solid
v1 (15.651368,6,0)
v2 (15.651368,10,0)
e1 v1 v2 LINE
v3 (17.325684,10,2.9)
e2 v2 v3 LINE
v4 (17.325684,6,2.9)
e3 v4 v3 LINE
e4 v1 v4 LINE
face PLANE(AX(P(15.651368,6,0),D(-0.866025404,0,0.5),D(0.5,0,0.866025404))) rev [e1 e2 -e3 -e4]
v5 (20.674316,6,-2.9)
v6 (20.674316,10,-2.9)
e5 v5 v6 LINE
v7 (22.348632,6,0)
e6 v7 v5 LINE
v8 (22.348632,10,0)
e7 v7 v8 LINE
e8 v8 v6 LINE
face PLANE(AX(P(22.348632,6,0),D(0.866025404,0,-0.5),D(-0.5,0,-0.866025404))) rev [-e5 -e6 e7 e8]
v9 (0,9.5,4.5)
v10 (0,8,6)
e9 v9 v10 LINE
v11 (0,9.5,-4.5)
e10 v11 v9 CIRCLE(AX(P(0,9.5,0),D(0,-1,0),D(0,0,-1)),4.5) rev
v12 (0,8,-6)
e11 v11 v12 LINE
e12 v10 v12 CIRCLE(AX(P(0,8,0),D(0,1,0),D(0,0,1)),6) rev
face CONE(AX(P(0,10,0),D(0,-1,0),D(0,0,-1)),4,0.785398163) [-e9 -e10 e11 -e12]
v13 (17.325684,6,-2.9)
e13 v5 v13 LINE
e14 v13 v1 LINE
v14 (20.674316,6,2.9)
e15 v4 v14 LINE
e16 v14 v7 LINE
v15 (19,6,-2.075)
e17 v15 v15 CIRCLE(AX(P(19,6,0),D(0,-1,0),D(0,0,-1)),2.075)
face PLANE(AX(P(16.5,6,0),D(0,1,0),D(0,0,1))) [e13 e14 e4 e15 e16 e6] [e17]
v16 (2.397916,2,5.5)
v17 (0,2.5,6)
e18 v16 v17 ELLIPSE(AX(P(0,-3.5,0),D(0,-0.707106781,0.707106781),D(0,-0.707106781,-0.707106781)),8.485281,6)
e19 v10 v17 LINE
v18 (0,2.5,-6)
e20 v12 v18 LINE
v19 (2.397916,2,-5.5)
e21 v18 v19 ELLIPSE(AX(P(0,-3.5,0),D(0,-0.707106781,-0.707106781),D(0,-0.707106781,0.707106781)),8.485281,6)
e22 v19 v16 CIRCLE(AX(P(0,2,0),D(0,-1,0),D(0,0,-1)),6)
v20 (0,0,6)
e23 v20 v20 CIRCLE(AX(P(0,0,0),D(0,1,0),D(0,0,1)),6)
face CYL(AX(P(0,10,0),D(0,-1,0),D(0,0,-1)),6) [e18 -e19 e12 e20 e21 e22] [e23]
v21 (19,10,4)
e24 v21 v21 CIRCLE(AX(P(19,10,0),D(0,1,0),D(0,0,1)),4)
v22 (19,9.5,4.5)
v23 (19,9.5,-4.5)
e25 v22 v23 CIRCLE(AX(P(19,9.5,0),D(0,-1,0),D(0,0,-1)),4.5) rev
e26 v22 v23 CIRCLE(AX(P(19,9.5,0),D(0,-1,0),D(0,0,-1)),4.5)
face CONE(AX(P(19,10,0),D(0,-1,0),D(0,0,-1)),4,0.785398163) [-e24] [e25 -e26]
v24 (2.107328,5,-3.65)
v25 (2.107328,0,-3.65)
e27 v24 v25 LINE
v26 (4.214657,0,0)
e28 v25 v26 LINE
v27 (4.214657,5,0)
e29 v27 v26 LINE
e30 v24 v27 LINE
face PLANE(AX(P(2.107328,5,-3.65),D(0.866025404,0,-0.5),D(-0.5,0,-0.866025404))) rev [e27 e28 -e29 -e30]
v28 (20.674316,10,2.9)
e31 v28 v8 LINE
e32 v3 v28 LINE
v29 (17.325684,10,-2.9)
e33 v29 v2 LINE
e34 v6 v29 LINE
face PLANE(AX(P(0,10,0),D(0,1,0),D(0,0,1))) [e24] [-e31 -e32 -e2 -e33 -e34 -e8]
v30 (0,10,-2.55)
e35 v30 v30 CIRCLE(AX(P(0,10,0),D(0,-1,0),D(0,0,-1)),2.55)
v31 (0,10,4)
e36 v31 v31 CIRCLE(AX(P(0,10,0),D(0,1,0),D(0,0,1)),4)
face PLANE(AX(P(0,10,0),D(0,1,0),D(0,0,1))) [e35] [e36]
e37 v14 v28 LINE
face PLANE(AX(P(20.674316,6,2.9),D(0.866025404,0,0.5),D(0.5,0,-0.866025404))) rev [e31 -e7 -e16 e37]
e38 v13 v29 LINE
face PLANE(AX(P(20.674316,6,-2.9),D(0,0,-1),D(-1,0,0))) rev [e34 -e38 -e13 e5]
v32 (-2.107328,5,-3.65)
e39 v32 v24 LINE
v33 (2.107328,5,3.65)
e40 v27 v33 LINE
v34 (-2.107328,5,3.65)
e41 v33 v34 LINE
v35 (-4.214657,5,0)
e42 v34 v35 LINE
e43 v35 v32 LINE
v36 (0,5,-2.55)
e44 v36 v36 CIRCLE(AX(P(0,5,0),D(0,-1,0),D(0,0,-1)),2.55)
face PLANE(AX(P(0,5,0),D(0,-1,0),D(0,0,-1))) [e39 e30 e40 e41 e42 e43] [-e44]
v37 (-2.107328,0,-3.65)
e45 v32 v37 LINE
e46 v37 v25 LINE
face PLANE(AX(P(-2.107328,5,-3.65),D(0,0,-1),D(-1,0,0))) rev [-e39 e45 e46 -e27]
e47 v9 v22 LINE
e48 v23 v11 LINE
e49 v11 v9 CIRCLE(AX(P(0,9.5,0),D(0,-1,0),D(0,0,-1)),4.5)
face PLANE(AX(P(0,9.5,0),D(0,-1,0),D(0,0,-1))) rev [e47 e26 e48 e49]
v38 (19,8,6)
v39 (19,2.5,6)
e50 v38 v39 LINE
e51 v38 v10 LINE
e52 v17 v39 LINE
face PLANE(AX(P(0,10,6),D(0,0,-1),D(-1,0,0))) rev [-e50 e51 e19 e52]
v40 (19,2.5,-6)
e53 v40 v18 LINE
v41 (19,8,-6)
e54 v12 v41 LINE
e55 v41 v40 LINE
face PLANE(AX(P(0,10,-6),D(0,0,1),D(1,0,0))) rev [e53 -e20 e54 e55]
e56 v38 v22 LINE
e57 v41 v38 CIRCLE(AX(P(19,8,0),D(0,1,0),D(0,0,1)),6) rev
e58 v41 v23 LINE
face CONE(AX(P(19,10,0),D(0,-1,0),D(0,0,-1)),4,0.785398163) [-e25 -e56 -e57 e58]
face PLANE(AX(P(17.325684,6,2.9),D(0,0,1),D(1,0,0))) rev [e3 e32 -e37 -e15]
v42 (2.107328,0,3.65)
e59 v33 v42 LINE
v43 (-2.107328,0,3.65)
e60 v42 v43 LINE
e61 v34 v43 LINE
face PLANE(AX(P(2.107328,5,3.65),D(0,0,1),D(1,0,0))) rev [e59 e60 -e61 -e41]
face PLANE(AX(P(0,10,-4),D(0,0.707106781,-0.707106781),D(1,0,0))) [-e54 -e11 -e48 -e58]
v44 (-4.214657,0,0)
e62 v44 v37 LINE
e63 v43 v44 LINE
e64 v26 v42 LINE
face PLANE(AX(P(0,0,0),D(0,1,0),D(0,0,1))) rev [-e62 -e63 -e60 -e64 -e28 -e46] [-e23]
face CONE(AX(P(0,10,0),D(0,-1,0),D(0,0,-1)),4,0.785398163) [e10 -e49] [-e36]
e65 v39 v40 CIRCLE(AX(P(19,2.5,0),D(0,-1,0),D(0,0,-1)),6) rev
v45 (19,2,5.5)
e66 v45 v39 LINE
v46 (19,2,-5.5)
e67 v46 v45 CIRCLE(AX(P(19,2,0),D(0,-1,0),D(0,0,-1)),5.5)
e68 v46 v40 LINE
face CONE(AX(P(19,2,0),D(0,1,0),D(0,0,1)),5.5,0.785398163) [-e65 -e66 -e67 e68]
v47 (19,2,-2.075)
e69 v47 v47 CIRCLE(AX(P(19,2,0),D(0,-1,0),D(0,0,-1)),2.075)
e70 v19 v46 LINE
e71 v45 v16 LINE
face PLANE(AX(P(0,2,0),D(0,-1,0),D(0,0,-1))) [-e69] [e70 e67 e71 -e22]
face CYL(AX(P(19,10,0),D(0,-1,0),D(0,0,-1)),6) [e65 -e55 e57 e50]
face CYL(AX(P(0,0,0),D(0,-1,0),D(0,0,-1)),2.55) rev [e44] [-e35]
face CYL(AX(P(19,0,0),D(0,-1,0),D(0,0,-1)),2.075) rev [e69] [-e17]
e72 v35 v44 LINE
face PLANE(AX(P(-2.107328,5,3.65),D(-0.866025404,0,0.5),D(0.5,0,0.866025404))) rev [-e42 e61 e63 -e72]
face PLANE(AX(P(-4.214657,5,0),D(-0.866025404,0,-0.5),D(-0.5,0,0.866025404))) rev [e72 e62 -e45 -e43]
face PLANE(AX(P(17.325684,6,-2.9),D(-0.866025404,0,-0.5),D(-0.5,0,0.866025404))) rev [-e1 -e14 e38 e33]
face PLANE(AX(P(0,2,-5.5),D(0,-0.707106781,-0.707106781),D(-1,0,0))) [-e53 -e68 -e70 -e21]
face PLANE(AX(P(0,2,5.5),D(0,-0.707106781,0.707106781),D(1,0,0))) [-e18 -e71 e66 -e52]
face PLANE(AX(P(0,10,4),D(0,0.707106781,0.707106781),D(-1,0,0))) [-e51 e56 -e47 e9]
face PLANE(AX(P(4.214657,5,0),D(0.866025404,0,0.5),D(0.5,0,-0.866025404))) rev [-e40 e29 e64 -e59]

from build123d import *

# Parameters (mm, degrees)
BOSS_EXTRUDE1_DEPTH = 10
CHAMFER1_SIZE       = 2
CUT_EXTRUDE1_DEPTH  = 5
SKETCH5_R           = 34.202431596
SKETCH5_R_2         = 6
CUT_EXTRUDE2_DEPTH  = 2
CUT_EXTRUDE3_DEPTH  = 4
CHAMFER2_SIZE       = 0.5
SKETCH7_W           = 40.92273168
SKETCH7_H           = 22.154300558
SKETCH7_R           = 4
CUT_EXTRUDE4_DEPTH  = 0.5
CHAMFER3_SIZE       = 0.5


# Some blends are built 0.0001 mm under size
with BuildPart() as part:
    # Sketch1 → Boss-Extrude1 (new body)
    with BuildSketch(Plane(origin=(0, 0, 0), x_dir=(1, 0, 0), z_dir=(0, 1, 0))):
        with BuildLine():
            Line((0, 6), (19, 6))
            ThreePointArc((19, 6), (25, 0), (19, -6))
            Line((19, -6), (0, -6))
            ThreePointArc((0, -6), (-6, 0), (0, 6))
        make_face()
    extrude(amount=BOSS_EXTRUDE1_DEPTH)

    # Sketch2 → Cut-Revolve1 (revolve, cut)
    with BuildSketch(Plane.XY, mode=Mode.PRIVATE) as cut_revolve1_sk:
        Polygon((0, 10), (-2.55, 10), (-2.55, 5), (-2.1, 5), (-2.1, 2), (-2.55, 2), (-2.55, 0), (0, 0), align=None)
    revolve(cut_revolve1_sk.sketch.rotate(Axis((0, 0, 0), (0, 1, 0)), 270), axis=Axis((0, 0, 0), (0, 1, 0)), mode=Mode.SUBTRACT)

    # Sketch3 → Cut-Revolve2 (revolve, cut)
    with BuildSketch(Plane.XY, mode=Mode.PRIVATE) as cut_revolve2_sk:
        Polygon((19, 10), (16.5, 10), (16.5, 6), (16.925, 6), (16.925, 0), (19, 0), align=None)
    revolve(cut_revolve2_sk.sketch.rotate(Axis((19, 0, 0), (0, 1, 0)), 270), axis=Axis((19, 0, 0), (0, 1, 0)), mode=Mode.SUBTRACT)

    # Chamfer1
    chamfer1_edges = [part.edges().sort_by_distance(p)[0] for p in [
        (25, 10, 0),
        (9.5, 10, -6),
        (-6, 10, 0),
        (9.5, 10, 6),
    ]]
    chamfer(chamfer1_edges, length=CHAMFER1_SIZE)

    # Sketch4 → Cut-Extrude1 (cut)
    with BuildSketch(Plane.XZ):
        Polygon((2.107328483, 3.65), (-2.107328483, 3.65), (-4.214656965, 0), (-2.107328483, -3.65), (2.107328483, -3.65), (4.214656965, 0), align=None)
    extrude(amount=-CUT_EXTRUDE1_DEPTH, mode=Mode.SUBTRACT)

    # Sketch5 → Cut-Extrude2 (cut)
    with BuildSketch(Plane.XZ):
        Circle(SKETCH5_R)
        with Locations(Location((0, 0, 0), (0, 0, 90))):
            Circle(SKETCH5_R_2, mode=Mode.SUBTRACT)
    extrude(amount=-CUT_EXTRUDE2_DEPTH, mode=Mode.SUBTRACT)

    # Sketch6 → Cut-Extrude3 (cut)
    with BuildSketch(Plane(origin=(0, 10, 0), x_dir=(1, 0, 0), z_dir=(0, 1, 0))):
        Polygon((20.674315781, -2.9), (22.348631561, 0), (20.674315781, 2.9), (17.325684219, 2.9), (15.651368439, 0), (17.325684219, -2.9), align=None)
    extrude(amount=-CUT_EXTRUDE3_DEPTH, mode=Mode.SUBTRACT)

    # Chamfer2
    # the kernel refuses this chamfer: 0.5 mm, written as the material it takes off along each edge
    with BuildSketch(Plane(origin=(19, 2, 0), x_dir=(0, 0, -1), z_dir=(-1, 0, 0))) as chamfer2_piece_1:
        Polygon((6 - CHAMFER2_SIZE, 0), (6, -CHAMFER2_SIZE), (6, 0), align=None)
    revolve(axis=Axis((19, 2, 0), (0, -1, 0)), revolution_arc=180, mode=Mode.SUBTRACT)
    with BuildSketch(Plane(origin=(-1.285841494, 2, 6), x_dir=(0, -0.02749587661058651, -0.9996219169112968), z_dir=(1, 0, 0))) as chamfer2_piece_2_section:
        Polygon((CHAMFER2_SIZE * 0.999621916911, CHAMFER2_SIZE * 0.0274958766106), (-CHAMFER2_SIZE * 0.0274958766106, CHAMFER2_SIZE * 0.999621916911), (0, 0), align=None)
    chamfer2_piece_2 = extrude(amount=20.285841494, mode=Mode.PRIVATE)
    chamfer2_piece_2 = chamfer2_piece_2 - Plane(origin=(0, 2.170377839, 0), x_dir=(0, 0, 1), z_dir=(0, -1, 0)) * Cylinder(6, 43, mode=Mode.PRIVATE)
    add(chamfer2_piece_2, mode=Mode.SUBTRACT)
    with BuildSketch(Plane(origin=(19, 2, -6), x_dir=(0, 0.9996219169112968, -0.027495876610585623), z_dir=(-1, 0, 0))) as chamfer2_piece_3_section:
        Polygon((CHAMFER2_SIZE * 0.999621916911, -CHAMFER2_SIZE * 0.0274958766106), (-CHAMFER2_SIZE * 0.0274958766106, -CHAMFER2_SIZE * 0.999621916911), (0, 0), align=None)
    chamfer2_piece_3 = extrude(amount=20.285841494, mode=Mode.PRIVATE)
    chamfer2_piece_3 = chamfer2_piece_3 - Plane(origin=(0, 2.17037784, 0), x_dir=(0, 0, 1), z_dir=(0, -1, 0)) * Cylinder(6, 43, mode=Mode.PRIVATE)
    add(chamfer2_piece_3, mode=Mode.SUBTRACT)

    # Sketch7 → Cut-Extrude4 (cut)
    with BuildSketch(Plane(origin=(0, 10, 0), x_dir=(1, 0, 0), z_dir=(0, 1, 0))):
        with Locations((9.45107525, -1.501135351)):
            Rectangle(SKETCH7_W, SKETCH7_H)
        with Locations(Location((19, 0, 0), (0, 0, 270))):
            Circle(SKETCH7_R, mode=Mode.SUBTRACT)
        with Locations(Location((0, 0, 0), (0, 0, 270))):
            Circle(SKETCH7_R, mode=Mode.SUBTRACT)
    extrude(amount=-CUT_EXTRUDE4_DEPTH, mode=Mode.SUBTRACT)

    # Chamfer3
    chamfer3_edges = [part.edges().sort_by_distance(p)[0] for p in [
        (0, 9.5, -4),
        (19, 9.5, -4),
    ]]
    chamfer(chamfer3_edges, length=CHAMFER3_SIZE - 0.0001)  # a hair under: the kernel refuses the full size


solid = part.part
